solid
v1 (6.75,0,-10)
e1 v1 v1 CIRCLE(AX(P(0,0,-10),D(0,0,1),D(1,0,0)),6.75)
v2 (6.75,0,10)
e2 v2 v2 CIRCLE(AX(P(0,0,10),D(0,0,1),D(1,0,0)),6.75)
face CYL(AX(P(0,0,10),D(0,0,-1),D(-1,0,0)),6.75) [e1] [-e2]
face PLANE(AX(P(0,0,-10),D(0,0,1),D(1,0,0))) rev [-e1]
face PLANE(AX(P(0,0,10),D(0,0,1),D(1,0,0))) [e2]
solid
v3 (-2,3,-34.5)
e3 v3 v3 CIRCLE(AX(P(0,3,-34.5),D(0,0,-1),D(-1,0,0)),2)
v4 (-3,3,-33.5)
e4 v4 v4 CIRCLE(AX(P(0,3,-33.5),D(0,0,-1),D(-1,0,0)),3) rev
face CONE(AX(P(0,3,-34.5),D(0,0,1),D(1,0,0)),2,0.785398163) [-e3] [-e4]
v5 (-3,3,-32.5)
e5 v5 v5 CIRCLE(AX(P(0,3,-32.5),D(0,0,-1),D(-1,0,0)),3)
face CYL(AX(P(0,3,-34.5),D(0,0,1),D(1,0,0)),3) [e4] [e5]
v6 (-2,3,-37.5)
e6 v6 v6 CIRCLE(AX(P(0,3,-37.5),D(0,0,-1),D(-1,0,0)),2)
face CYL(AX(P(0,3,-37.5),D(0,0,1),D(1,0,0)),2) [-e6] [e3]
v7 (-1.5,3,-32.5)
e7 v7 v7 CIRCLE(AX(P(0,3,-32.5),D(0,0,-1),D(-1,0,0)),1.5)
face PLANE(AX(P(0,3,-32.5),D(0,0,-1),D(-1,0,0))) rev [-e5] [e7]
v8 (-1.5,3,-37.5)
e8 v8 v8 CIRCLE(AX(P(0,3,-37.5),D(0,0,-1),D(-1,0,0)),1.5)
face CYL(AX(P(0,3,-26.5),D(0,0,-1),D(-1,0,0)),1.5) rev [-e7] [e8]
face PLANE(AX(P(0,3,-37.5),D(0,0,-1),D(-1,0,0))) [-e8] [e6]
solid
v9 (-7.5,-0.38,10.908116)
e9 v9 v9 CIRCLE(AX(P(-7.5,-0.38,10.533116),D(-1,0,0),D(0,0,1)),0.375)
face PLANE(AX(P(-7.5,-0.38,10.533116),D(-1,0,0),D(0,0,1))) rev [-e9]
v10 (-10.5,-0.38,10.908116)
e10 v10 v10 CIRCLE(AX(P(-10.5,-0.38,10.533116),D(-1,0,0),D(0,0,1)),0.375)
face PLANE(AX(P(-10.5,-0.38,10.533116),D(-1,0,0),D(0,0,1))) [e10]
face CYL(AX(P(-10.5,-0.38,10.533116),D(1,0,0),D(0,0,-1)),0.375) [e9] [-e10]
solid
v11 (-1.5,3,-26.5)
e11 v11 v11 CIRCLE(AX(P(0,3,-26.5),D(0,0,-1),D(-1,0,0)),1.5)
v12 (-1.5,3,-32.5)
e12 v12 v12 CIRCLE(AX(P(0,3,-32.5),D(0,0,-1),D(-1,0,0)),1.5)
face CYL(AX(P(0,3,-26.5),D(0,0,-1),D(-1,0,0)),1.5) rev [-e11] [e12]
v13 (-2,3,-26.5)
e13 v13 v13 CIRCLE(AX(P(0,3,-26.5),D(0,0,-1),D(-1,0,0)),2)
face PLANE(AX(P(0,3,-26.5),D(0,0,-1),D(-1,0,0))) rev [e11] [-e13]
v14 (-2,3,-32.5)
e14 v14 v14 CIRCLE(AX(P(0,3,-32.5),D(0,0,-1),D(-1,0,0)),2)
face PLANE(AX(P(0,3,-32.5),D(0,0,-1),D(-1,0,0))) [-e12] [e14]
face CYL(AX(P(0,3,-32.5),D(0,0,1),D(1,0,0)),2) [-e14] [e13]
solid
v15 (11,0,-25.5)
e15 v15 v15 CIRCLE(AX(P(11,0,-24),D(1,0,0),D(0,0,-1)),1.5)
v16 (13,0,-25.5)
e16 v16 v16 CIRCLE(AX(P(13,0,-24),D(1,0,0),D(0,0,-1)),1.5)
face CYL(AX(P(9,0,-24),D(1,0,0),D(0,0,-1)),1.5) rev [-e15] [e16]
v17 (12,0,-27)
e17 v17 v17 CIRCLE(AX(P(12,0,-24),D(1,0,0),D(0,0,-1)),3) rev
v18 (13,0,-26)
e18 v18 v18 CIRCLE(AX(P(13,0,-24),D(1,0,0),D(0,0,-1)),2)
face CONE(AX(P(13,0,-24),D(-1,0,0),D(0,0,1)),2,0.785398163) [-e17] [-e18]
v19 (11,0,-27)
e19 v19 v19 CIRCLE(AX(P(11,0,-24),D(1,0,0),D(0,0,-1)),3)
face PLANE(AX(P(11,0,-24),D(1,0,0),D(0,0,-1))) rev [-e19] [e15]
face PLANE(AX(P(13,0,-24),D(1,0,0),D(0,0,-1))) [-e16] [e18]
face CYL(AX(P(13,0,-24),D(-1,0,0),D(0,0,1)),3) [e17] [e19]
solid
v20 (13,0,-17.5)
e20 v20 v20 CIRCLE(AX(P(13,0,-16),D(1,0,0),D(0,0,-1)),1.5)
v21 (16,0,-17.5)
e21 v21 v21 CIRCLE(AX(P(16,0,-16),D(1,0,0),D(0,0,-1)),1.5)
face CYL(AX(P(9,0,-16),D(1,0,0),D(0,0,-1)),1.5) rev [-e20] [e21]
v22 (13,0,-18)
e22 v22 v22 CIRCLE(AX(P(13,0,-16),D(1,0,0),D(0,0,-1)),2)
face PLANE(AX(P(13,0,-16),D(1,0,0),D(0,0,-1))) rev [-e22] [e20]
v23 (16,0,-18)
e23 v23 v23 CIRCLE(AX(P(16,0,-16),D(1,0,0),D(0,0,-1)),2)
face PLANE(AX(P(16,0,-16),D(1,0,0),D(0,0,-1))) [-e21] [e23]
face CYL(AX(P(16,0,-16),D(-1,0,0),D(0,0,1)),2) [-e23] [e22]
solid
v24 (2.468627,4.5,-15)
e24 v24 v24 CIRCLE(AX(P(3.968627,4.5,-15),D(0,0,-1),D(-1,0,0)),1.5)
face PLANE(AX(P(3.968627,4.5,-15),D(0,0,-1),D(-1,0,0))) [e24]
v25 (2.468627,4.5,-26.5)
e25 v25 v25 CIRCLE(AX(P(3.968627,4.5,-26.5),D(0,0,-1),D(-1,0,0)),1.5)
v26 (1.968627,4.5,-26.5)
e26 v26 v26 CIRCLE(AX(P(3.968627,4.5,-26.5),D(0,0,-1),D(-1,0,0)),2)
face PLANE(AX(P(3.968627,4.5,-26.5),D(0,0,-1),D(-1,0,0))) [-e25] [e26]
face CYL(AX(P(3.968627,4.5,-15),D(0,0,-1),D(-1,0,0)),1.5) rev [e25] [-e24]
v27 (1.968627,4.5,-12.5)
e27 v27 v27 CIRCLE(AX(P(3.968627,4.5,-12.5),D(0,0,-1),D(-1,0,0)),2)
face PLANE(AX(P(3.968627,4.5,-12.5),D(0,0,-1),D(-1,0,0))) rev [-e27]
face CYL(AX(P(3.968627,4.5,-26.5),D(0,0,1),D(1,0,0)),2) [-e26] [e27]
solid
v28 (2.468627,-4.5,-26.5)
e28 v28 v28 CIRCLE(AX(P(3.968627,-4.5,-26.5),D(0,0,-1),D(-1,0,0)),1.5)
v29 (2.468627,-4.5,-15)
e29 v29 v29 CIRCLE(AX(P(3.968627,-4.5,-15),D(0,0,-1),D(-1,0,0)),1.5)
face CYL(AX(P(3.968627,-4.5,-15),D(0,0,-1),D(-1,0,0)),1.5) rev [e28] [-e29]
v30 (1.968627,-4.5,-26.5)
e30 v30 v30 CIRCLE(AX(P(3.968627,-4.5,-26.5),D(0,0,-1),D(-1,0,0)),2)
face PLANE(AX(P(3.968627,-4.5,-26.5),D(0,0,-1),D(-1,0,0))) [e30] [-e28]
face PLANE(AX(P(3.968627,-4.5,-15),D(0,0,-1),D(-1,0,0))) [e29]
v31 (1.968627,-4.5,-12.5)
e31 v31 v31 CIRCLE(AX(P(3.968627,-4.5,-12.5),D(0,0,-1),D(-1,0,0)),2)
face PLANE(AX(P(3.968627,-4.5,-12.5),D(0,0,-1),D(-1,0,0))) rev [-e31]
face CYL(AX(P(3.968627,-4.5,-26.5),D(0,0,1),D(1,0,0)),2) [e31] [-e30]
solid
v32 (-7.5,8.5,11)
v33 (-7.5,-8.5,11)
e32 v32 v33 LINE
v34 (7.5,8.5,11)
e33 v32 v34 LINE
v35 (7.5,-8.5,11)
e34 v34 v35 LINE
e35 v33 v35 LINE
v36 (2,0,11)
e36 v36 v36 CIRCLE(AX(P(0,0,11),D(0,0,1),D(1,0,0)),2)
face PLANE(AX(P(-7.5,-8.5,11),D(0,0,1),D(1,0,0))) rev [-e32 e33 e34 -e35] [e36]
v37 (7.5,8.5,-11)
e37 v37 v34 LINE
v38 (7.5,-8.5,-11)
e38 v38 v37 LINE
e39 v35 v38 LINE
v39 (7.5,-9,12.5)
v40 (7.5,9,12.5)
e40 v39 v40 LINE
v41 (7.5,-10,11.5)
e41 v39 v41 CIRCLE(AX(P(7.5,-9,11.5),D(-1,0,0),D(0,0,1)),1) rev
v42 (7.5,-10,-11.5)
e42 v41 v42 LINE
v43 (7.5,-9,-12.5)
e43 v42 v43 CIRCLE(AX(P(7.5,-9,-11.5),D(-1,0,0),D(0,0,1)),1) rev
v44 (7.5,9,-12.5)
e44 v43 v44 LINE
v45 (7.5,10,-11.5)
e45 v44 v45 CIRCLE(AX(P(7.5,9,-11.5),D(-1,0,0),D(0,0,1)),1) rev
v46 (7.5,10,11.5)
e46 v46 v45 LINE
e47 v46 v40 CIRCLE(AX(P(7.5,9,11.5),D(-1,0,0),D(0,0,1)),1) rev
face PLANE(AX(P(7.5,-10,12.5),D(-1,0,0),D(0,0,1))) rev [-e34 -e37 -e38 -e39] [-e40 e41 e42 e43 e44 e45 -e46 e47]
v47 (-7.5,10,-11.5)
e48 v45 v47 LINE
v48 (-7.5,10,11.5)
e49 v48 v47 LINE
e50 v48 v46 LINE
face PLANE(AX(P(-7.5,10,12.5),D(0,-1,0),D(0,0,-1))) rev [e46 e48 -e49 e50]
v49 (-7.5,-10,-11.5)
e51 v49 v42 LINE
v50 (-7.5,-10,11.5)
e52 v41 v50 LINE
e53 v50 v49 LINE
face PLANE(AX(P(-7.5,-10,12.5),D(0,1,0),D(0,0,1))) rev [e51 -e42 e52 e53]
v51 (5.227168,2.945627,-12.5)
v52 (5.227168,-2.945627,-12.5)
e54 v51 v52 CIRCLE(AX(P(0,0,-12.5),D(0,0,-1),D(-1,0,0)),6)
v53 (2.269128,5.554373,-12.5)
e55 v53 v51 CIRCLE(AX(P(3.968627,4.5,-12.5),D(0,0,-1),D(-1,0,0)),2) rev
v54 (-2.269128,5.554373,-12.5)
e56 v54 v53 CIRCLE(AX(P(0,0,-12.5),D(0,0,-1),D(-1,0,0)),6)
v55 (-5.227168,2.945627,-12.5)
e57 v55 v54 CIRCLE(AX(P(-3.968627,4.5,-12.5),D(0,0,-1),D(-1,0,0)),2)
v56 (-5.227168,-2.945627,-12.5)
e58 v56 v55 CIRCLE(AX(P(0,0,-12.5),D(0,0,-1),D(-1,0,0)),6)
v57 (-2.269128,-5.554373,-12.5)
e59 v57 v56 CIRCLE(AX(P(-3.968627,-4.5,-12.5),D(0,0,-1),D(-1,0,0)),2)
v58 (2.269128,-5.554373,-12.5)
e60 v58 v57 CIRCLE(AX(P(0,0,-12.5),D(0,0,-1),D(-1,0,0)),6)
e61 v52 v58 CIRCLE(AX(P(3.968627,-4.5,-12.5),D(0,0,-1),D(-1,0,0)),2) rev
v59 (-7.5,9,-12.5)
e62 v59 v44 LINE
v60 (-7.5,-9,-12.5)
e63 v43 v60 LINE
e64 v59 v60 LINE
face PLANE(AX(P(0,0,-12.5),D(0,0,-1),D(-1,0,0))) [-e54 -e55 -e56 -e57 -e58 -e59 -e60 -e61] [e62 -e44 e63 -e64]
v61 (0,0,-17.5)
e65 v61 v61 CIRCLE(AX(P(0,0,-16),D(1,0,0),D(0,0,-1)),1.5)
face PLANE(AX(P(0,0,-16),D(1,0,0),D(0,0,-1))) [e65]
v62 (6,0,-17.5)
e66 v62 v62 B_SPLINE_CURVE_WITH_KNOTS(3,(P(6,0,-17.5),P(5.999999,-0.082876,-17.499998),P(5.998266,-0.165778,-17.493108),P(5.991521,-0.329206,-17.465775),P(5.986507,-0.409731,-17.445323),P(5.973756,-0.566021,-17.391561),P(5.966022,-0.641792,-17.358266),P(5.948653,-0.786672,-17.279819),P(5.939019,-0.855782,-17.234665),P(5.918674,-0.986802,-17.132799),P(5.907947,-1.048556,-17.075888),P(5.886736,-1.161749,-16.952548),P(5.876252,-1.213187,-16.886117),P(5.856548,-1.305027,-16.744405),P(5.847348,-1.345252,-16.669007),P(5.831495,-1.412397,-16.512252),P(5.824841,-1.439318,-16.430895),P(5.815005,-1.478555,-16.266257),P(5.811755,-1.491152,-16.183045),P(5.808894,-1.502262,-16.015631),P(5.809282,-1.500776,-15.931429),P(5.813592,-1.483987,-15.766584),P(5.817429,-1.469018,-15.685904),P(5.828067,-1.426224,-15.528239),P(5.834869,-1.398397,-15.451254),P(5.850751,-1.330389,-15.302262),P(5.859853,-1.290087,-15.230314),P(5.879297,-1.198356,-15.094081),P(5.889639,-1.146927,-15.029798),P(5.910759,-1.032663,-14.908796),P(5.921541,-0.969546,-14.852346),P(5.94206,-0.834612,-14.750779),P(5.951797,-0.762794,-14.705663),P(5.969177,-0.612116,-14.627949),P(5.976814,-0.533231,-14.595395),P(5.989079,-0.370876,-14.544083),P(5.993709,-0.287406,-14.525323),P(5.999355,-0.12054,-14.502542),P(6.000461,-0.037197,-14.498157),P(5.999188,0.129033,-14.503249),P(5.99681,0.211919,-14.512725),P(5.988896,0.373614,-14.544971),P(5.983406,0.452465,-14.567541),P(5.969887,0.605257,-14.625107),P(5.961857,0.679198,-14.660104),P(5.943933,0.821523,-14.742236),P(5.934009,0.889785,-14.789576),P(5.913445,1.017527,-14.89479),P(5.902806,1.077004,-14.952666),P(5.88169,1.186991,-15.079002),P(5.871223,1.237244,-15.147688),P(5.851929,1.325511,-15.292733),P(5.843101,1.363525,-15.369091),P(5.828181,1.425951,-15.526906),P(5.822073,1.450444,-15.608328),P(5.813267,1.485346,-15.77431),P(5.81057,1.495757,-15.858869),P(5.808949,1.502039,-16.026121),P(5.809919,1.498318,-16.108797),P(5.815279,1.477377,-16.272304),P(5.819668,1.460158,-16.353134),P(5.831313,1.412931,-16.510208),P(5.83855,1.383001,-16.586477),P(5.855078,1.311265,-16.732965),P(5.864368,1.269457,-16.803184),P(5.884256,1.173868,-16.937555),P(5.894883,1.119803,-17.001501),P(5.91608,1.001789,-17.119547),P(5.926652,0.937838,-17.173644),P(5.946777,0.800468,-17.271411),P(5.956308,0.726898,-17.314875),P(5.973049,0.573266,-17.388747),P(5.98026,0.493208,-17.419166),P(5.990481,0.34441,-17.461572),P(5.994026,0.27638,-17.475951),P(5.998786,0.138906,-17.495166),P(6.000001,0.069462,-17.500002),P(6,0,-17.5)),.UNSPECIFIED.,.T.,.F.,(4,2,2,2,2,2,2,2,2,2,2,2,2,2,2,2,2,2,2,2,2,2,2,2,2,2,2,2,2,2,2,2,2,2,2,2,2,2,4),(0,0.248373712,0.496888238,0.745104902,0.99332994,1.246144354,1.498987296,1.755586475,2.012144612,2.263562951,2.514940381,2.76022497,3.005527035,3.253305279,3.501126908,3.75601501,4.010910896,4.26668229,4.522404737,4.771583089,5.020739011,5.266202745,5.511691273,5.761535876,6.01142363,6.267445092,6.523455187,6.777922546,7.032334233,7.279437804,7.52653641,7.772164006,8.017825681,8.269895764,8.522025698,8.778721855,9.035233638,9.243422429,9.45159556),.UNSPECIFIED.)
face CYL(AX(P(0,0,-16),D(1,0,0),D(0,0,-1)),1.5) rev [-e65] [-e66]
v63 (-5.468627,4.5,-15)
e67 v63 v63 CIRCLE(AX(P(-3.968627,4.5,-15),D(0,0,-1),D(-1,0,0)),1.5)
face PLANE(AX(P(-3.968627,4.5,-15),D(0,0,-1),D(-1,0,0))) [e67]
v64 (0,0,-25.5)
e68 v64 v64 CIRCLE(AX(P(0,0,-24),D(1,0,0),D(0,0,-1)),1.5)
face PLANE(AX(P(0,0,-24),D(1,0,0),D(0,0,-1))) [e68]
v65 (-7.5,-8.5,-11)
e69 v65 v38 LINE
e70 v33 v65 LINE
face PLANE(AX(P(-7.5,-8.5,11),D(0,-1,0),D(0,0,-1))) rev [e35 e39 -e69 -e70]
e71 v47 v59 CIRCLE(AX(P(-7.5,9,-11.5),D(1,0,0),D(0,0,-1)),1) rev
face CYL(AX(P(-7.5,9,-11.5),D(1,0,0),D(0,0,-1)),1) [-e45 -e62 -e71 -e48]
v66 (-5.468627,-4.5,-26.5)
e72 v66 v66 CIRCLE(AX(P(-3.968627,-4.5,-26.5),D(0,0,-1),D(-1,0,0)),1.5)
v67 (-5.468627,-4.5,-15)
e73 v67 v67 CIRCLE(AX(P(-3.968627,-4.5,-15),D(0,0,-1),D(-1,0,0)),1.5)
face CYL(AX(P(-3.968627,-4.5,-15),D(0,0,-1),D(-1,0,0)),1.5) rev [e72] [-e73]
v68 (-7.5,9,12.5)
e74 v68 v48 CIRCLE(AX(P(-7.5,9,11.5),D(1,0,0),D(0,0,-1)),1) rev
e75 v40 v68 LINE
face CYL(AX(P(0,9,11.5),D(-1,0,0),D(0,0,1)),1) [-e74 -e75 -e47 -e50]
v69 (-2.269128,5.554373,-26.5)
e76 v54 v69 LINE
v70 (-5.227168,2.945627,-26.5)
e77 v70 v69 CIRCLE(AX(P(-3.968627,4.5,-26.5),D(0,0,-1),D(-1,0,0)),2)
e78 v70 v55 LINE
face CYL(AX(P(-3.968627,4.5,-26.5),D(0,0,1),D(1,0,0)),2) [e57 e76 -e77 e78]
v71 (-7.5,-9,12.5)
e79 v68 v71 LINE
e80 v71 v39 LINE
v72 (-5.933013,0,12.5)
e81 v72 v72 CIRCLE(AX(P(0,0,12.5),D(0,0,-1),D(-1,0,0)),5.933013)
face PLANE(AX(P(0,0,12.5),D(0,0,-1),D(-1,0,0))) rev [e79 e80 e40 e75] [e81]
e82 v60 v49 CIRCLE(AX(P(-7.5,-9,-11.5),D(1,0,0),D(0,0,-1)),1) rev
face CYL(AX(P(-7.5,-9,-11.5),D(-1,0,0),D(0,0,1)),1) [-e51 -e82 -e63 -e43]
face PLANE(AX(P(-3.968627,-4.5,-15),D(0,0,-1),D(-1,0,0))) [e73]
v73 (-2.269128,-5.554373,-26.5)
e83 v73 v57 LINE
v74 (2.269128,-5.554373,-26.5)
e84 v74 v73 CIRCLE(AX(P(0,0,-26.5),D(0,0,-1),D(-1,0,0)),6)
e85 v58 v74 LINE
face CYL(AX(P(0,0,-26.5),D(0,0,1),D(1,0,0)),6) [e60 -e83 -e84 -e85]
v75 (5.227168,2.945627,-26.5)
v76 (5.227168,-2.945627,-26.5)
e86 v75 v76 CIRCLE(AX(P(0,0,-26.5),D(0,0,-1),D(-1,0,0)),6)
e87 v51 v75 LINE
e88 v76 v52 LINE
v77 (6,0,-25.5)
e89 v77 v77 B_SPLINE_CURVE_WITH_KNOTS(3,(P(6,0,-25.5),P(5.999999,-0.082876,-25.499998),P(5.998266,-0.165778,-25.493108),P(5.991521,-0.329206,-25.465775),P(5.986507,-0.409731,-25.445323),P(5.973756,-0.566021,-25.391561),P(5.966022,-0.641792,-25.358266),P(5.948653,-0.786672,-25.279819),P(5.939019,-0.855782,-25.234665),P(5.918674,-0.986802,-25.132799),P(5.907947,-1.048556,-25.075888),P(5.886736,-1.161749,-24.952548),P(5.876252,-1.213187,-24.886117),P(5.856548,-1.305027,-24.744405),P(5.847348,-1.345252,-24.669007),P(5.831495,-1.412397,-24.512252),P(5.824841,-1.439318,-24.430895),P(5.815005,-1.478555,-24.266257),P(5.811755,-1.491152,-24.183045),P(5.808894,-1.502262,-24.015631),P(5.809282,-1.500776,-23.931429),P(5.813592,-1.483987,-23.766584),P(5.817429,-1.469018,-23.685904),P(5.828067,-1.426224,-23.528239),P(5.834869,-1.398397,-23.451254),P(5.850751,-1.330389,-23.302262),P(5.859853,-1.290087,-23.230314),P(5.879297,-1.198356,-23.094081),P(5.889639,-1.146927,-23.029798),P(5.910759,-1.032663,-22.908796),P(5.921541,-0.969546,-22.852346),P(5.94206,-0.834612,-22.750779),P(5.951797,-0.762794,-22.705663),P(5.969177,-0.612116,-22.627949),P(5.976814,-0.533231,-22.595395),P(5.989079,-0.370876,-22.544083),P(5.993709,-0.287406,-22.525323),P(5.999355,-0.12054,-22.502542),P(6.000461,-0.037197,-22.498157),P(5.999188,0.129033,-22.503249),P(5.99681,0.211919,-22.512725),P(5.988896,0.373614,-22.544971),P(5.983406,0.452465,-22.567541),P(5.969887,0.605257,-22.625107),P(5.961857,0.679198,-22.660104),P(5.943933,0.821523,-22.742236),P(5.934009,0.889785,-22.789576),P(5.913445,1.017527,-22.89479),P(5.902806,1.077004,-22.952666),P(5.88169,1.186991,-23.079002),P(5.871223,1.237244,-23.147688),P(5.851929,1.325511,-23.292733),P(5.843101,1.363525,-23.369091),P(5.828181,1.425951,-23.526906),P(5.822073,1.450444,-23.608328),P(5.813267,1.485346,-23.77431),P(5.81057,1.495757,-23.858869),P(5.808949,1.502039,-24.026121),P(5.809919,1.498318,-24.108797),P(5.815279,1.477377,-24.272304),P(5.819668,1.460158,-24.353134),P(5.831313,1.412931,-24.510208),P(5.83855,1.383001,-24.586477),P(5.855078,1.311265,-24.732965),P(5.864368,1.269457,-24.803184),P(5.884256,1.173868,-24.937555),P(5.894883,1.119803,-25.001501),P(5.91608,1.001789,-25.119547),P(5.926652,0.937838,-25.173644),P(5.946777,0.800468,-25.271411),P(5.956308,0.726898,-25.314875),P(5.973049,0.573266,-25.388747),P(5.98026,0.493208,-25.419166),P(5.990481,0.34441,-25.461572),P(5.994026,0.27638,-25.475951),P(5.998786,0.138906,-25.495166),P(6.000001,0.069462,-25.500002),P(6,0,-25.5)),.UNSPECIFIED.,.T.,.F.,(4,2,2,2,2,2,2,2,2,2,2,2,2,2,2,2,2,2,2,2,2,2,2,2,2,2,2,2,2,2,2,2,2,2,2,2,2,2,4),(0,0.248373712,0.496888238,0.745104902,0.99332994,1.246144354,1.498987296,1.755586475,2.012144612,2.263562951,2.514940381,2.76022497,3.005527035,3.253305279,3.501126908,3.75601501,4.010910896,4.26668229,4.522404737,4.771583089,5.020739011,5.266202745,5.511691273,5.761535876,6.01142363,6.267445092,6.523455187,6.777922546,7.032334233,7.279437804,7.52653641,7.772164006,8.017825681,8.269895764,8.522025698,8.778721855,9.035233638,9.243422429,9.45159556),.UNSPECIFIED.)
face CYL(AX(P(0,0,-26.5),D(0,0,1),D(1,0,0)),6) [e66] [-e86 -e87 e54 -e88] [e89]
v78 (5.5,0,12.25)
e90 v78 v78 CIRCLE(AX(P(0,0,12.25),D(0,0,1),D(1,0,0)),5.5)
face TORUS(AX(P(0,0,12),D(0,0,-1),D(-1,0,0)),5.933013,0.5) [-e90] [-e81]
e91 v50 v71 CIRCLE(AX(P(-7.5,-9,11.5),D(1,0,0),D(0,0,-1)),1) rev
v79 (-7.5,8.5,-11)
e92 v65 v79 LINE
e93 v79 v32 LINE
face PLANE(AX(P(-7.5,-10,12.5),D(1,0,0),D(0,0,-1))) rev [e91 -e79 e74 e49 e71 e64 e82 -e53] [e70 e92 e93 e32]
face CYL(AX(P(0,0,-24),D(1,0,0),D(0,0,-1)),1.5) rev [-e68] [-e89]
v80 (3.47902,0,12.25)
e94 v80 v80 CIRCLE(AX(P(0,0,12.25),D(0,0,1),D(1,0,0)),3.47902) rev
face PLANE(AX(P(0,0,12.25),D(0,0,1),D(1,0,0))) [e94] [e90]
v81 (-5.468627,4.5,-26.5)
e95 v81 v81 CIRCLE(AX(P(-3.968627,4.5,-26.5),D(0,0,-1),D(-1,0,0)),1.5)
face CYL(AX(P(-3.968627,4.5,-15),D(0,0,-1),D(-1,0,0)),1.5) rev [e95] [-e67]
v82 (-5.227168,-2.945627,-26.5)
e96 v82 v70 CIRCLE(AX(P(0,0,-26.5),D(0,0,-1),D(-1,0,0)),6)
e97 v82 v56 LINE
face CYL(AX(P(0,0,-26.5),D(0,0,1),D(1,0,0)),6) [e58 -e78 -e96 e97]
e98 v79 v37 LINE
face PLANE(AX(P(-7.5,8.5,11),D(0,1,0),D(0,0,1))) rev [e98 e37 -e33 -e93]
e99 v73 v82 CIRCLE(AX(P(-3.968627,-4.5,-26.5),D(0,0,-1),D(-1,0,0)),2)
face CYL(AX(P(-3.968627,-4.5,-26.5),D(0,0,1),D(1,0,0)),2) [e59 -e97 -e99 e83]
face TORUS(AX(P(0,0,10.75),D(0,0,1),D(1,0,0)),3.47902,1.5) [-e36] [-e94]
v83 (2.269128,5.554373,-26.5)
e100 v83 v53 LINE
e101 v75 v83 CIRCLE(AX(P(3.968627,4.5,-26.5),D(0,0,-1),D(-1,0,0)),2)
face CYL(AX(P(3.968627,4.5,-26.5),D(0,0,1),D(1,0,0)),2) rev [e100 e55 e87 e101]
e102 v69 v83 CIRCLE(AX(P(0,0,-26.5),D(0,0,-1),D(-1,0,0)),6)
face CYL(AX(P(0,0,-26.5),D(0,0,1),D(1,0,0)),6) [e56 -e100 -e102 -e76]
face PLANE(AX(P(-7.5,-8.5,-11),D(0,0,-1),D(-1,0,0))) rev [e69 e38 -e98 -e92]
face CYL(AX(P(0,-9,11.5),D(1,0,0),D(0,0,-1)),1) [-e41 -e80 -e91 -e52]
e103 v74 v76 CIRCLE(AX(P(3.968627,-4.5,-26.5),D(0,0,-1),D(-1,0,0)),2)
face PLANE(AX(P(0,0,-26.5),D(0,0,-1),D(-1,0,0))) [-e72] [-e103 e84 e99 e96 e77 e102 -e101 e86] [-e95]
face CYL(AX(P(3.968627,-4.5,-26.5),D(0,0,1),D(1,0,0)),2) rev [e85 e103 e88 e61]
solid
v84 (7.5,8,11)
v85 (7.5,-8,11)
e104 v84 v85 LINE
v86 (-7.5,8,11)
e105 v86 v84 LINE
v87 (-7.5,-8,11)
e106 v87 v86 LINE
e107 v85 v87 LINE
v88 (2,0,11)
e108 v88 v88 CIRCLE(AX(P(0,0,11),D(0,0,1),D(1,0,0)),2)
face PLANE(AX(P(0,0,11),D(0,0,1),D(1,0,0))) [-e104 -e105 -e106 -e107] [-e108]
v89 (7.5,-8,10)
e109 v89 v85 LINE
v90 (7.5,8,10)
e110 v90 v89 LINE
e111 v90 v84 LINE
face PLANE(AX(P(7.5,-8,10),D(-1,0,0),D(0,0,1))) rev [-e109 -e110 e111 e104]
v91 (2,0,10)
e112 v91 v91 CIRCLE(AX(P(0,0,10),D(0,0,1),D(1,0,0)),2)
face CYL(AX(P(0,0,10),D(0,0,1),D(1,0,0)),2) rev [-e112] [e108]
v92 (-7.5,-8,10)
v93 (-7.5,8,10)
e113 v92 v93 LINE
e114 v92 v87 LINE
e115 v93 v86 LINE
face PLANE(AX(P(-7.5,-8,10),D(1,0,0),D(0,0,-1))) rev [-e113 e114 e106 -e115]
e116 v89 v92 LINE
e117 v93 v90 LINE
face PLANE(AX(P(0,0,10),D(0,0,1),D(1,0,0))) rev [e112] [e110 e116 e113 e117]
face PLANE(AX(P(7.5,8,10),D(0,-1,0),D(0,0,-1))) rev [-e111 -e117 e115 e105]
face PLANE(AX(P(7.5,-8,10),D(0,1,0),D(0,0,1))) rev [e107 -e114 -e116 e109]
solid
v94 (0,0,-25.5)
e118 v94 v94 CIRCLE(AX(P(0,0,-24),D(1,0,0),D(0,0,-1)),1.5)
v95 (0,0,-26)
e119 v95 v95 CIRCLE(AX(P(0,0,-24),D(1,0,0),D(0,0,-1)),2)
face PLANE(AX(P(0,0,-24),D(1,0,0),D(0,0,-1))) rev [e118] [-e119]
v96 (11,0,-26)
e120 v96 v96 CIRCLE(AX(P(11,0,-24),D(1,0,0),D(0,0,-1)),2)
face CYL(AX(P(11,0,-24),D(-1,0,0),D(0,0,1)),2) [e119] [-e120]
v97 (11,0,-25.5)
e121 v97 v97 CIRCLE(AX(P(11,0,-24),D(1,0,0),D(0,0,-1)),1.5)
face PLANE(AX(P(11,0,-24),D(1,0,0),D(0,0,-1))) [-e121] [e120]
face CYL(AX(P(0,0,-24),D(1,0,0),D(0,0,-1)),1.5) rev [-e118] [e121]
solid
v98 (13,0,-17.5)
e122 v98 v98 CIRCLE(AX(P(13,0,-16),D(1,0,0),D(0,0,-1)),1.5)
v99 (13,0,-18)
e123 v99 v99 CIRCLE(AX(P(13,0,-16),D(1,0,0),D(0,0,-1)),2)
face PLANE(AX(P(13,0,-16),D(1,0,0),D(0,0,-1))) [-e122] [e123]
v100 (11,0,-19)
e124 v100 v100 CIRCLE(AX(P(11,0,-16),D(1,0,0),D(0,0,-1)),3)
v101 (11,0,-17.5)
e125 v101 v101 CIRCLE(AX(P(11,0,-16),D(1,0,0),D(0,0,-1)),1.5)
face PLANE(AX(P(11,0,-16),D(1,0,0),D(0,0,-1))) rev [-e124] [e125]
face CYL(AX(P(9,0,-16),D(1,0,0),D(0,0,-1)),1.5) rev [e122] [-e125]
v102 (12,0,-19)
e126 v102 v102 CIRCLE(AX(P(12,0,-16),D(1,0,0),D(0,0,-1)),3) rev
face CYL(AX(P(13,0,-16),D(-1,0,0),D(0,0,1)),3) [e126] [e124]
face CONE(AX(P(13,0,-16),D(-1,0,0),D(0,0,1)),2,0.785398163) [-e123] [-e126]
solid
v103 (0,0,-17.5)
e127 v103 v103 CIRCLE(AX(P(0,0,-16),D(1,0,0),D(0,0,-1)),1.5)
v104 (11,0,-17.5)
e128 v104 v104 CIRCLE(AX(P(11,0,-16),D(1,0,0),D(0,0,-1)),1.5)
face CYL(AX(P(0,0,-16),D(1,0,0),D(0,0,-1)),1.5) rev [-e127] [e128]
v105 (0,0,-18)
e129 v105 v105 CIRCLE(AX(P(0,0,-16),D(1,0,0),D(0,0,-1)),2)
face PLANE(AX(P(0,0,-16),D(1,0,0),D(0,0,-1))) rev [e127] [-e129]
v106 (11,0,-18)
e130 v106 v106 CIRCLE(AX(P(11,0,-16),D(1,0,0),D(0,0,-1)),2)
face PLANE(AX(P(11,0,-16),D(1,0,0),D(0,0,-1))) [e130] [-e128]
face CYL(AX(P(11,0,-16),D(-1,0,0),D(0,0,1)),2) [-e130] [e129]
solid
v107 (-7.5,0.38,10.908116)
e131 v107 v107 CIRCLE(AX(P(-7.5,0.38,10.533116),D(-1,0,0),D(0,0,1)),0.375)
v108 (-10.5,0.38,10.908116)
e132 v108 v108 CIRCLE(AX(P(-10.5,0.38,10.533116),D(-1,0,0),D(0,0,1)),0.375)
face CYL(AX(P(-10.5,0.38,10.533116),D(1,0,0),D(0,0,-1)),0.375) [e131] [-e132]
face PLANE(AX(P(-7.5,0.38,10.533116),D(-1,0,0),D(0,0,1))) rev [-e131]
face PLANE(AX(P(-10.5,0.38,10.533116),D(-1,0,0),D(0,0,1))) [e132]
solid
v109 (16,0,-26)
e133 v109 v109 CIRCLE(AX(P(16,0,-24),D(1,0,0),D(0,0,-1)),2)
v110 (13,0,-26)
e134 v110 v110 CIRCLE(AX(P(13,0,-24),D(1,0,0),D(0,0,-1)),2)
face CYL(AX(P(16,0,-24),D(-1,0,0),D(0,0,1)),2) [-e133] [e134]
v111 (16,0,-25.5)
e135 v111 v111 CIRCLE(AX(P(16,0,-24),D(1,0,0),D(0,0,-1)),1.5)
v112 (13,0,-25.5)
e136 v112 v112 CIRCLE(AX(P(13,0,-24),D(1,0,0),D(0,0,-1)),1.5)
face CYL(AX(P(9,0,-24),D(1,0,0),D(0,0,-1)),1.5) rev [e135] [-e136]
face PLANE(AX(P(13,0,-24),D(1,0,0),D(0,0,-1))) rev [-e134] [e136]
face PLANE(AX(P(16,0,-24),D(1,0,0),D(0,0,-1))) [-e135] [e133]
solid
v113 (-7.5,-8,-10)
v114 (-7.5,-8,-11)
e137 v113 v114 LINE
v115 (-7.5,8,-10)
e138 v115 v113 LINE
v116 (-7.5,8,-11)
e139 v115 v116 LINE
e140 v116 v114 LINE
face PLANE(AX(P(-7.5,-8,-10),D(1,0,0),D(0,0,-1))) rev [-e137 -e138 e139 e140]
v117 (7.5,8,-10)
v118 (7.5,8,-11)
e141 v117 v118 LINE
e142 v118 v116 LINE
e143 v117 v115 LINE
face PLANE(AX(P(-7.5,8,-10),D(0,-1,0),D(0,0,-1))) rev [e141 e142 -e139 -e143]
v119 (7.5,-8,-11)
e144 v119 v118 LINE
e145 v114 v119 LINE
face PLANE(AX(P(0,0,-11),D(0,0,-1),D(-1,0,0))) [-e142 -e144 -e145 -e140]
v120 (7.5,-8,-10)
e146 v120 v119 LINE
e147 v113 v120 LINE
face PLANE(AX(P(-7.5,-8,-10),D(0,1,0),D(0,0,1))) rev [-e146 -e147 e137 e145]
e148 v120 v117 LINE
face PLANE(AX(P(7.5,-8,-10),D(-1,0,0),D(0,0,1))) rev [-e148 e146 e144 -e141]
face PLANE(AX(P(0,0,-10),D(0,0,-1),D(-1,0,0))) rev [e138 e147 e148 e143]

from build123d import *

# Parameters (mm, degrees)
SKETCH1_W                    = 15
SKETCH1_H                    = 20
OUTER_SHELL_DEPTH            = 12.5
SKETCH2_W                    = 22
SKETCH2_H                    = 17
CUT_EXTRUDE1_DEPTH           = 15
SKETCH4_W                    = 15
SKETCH4_H                    = 16
INNER1_DEPTH                 = 1
SKETCH5_W                    = 15
SKETCH5_H                    = 16
INNER2_DEPTH                 = 1
SKETCH6_R                    = 6.75
INNER_CYLINDER_DEPTH         = 20
FILLET1_R                    = 1
SKETCH7_R                    = 5.5
CUT_EXTRUDE2_DEPTH           = 0.25
SKETCH8_R                    = 2
CUT_EXTRUDE3_DEPTH           = 2.25
FILLET2_R                    = 0.5
FILLET3_R                    = 1.5
SKETCH9_R                    = 6
OUTER_CYLINDER_DEPTH         = 14
SKETCH10_R                   = 2
CIRCLE_CUTS_DEPTH            = 28.950849719
SKETCH11_R                   = 2
SMALL_CYLINDERS_DEPTH        = 14
SMALL_CYLINDERS_2_DEPTH      = 14
SMALL_CYLINDERS_3_DEPTH      = 14
SMALL_CYLINDERS_4_DEPTH      = 14
SKETCH12_R                   = 1.5
CUT_EXTRUDE6_DEPTH           = 11.5
BOSS_EXTRUDE9_DEPTH          = 14
SKETCH15_R                   = 2
HORIZONTAL_CYLINDERS_DEPTH   = 11
HORIZONTAL_CYLINDERS_2_DEPTH = 11
SKETCH16_R                   = 1.5
CUT_EXTRUDE7_DEPTH           = 11
SKETCH17_R                   = 3
BOSS_EXTRUDE11_DEPTH         = 2
BOSS_EXTRUDE11_2_DEPTH       = 2
SKETCH19_R                   = 2
BOSS_EXTRUDE12_DEPTH         = 3
BOSS_EXTRUDE12_2_DEPTH       = 3
CHAMFER2_SIZE                = 1
CHAMFER3_SIZE                = 1
SKETCH20_R                   = 1.5
CUT_EXTRUDE8_DEPTH           = 7
SKETCH21_R                   = 2
BOSS_EXTRUDE13_DEPTH         = 6
SKETCH22_R                   = 3
BOSS_EXTRUDE14_DEPTH         = 2
SKETCH23_R                   = 2
BOSS_EXTRUDE15_DEPTH         = 3
CHAMFER4_SIZE                = 1
SKETCH24_R                   = 1.5
CUT_EXTRUDE9_DEPTH           = 11
SKETCH25_R                   = 0.375
BOSS_EXTRUDE17_DEPTH         = 3
BOSS_EXTRUDE17_2_DEPTH       = 3


# Some blends are built 0.0001 mm under size
with BuildPart() as part:
    # Sketch1 → Outer Shell (new, symmetric)
    with BuildSketch(Plane.XY):
        Rectangle(SKETCH1_W, SKETCH1_H)
    extrude(amount=OUTER_SHELL_DEPTH, both=True)

    # Sketch2 → Cut-Extrude1 (cut)
    with BuildSketch(Plane(origin=(7.5, 0, 0), x_dir=(0, 0, -1), z_dir=(1, 0, 0))):
        Rectangle(SKETCH2_W, SKETCH2_H)
    extrude(amount=-CUT_EXTRUDE1_DEPTH, mode=Mode.SUBTRACT)

    # Fillet1
    fillet1_edges = [part.edges().sort_by_distance(p)[0] for p in [
        (0, -10, 12.5),
        (0, -10, -12.5),
        (0, 10, -12.5),
        (0, 10, 12.5),
    ]]
    fillet(fillet1_edges, radius=FILLET1_R)

    # Sketch7 → Cut-Extrude2 (cut)
    with BuildSketch(Plane.XY.offset(12.5)):
        Circle(SKETCH7_R)
    extrude(amount=-CUT_EXTRUDE2_DEPTH, mode=Mode.SUBTRACT)


with BuildPart() as body_2:
    # Sketch4 → Inner1 (new body)
    with BuildSketch(Plane(origin=(0, 0, 11), x_dir=(-1, 0, 0), z_dir=(0, 0, -1))):
        Rectangle(SKETCH4_W, SKETCH4_H)
    extrude(amount=INNER1_DEPTH)


with BuildPart() as body_3:
    # Sketch5 → Inner2 (new body)
    with BuildSketch(Plane.XY.offset(-11)):
        Rectangle(SKETCH5_W, SKETCH5_H)
    extrude(amount=INNER2_DEPTH)


with BuildPart() as body_4:
    # Sketch6 → Inner Cylinder (new body)
    with BuildSketch(Plane.XY.offset(-10)):
        Circle(SKETCH6_R)
    extrude(amount=INNER_CYLINDER_DEPTH)


with BuildPart() as cut_extrude3_tool:
    # Sketch8 → Cut-Extrude3 (new body)
    with BuildSketch(Plane.XY.offset(12.25)):
        Circle(SKETCH8_R)
    extrude(amount=-CUT_EXTRUDE3_DEPTH)


with BuildPart() as part_1:
    add(part.part)

    # Cut-Extrude3: cut by cut_extrude3_tool
    add(cut_extrude3_tool.part, mode=Mode.SUBTRACT)

    # Fillet2
    # the kernel refuses this fillet: 0.5 mm, written as the material it takes off along each edge
    with BuildSketch(Plane(origin=(0, 0, 12.5), x_dir=(1, 0, 0), z_dir=(0, -1, 0))) as fillet2_piece_1:
        with BuildLine():
            CenterArc((5.933012702, -0.5), FILLET2_R, 90, 60)
            Line((5.5, -0.25), (5.491339746, -0.245))
            ThreePointArc((5.491339746, -0.245), (5.49, -0.125), (5.49, 0))
            Line((5.49, 0), (5.5, 0.01))
            Line((5.5, 0.01), (5.933012702, 0.01))
            Line((5.933012702, 0.01), (5.933012702, 0))
        make_face()
    revolve(axis=Axis((0, 0, 12.5), (0, 0, 1)), mode=Mode.SUBTRACT)

    # Fillet3
    # the kernel refuses this fillet: 1.5 mm, written as the material it takes off along each edge
    with BuildSketch(Plane(origin=(0, 0, 12.25), x_dir=(1, 0, 0), z_dir=(0, -1, 0))) as fillet3_piece_1:
        with BuildLine():
            CenterArc((3.479019946, -1.5), FILLET3_R, 90, 80.405931773)
            Line((3.479019946, 0), (3.479019946, 0.03))
            Line((3.479019946, 0.03), (2, 0.03))
            Line((2, 0.03), (1.97, 0))
            ThreePointArc((1.97, 0), (1.97, -0.625), (1.970419601, -1.245))
            Line((1.970419601, -1.245), (2, -1.25))
        make_face()
    revolve(axis=Axis((0, 0, 12.25), (0, 0, 1)), mode=Mode.SUBTRACT)



with BuildPart() as body_2_1:
    add(body_2.part)

    # Cut-Extrude3: cut by cut_extrude3_tool
    add(cut_extrude3_tool.part, mode=Mode.SUBTRACT)


with BuildPart() as body_5:
    # Sketch9 → outer cylinder (new body)
    with BuildSketch(Plane(origin=(0, 0, -12.5), x_dir=(-1, 0, 0), z_dir=(0, 0, -1))):
        Circle(SKETCH9_R)
    extrude(amount=OUTER_CYLINDER_DEPTH)

    # Sketch10 → circle cuts (cut, through all)
    with BuildSketch(Plane(origin=(0, 0, -12.5), x_dir=(-1, 0, 0), z_dir=(0, 0, -1))):
        with Locations((-3.968626967, -4.5)):
            Circle(SKETCH10_R)
        with Locations((3.968626967, -4.5)):
            Circle(SKETCH10_R)
        with Locations((3.968626967, 4.5)):
            Circle(SKETCH10_R)
        with Locations((-3.968626967, 4.5)):
            Circle(SKETCH10_R)
    extrude(amount=CIRCLE_CUTS_DEPTH, mode=Mode.SUBTRACT)


with BuildPart() as body_6:
    # Sketch11 → small cylinders (new body)
    with BuildSketch(Plane(origin=(0, 0, -12.5), x_dir=(-1, 0, 0), z_dir=(0, 0, -1))):
        with Locations((-3.968626967, 4.5)):
            Circle(SKETCH11_R)
    extrude(amount=SMALL_CYLINDERS_DEPTH)


with BuildPart() as body_7:
    # Sketch11 → small cylinders 2 (new body)
    with BuildSketch(Plane(origin=(0, 0, -12.5), x_dir=(-1, 0, 0), z_dir=(0, 0, -1))):
        with Locations((3.968626967, 4.5)):
            Circle(SKETCH11_R)
    extrude(amount=SMALL_CYLINDERS_2_DEPTH)


with BuildPart() as body_8:
    # Sketch11 → small cylinders 3 (new body)
    with BuildSketch(Plane(origin=(0, 0, -12.5), x_dir=(-1, 0, 0), z_dir=(0, 0, -1))):
        with Locations((-3.968626967, -4.5)):
            Circle(SKETCH11_R)
    extrude(amount=SMALL_CYLINDERS_3_DEPTH)


with BuildPart() as body_9:
    # Sketch11 → small cylinders 4 (new body)
    with BuildSketch(Plane(origin=(0, 0, -12.5), x_dir=(-1, 0, 0), z_dir=(0, 0, -1))):
        with Locations((3.968626967, -4.5)):
            Circle(SKETCH11_R)
    extrude(amount=SMALL_CYLINDERS_4_DEPTH)


with BuildPart() as cut_extrude6_tool:
    # Sketch12 → Cut-Extrude6 (new body)
    with BuildSketch(Plane(origin=(0, 0, -26.5), x_dir=(-1, 0, 0), z_dir=(0, 0, -1))):
        with Locations((-3.968626967, 4.5)):
            Circle(SKETCH12_R)
        with Locations((3.968626967, 4.5)):
            Circle(SKETCH12_R)
        with Locations((-3.968626967, -4.5)):
            Circle(SKETCH12_R)
        with Locations((3.968626967, -4.5)):
            Circle(SKETCH12_R)
    extrude(amount=-CUT_EXTRUDE6_DEPTH)


with BuildPart() as body_6_1:
    add(body_6.part)

    # Cut-Extrude6: cut by cut_extrude6_tool
    add(cut_extrude6_tool.part, mode=Mode.SUBTRACT)


with BuildPart() as body_7_1:
    add(body_7.part)

    # Cut-Extrude6: cut by cut_extrude6_tool
    add(cut_extrude6_tool.part, mode=Mode.SUBTRACT)


with BuildPart() as body_8_1:
    add(body_8.part)

    # Cut-Extrude6: cut by cut_extrude6_tool
    add(cut_extrude6_tool.part, mode=Mode.SUBTRACT)


with BuildPart() as body_9_1:
    add(body_9.part)

    # Cut-Extrude6: cut by cut_extrude6_tool
    add(cut_extrude6_tool.part, mode=Mode.SUBTRACT)


with BuildPart() as part_2:
    add(part_1.part)

    add(body_5.part)  # Boss-Extrude9 merges body 5

    add(body_7_1.part)  # Boss-Extrude9 merges body 7

    add(body_9_1.part)  # Boss-Extrude9 merges body 9
    # Sketch14 → Boss-Extrude9 (add)
    with BuildSketch(Plane(origin=(0, 0, -12.5), x_dir=(-1, 0, 0), z_dir=(0, 0, -1))):
        Polygon((5.227167636, 2.945627013), (5.227167636, -2.945627013), (4.923679057, -2.700868739), (4.923679057, 2.642138434), align=None)
    extrude(amount=BOSS_EXTRUDE9_DEPTH)


with BuildPart() as body_7_2:
    # Sketch15 → horizontal cylinders (new body)
    with BuildSketch(Plane(origin=(0, 0, 0), x_dir=(0, 0, -1), z_dir=(1, 0, 0))):
        with Locations((16, 0)):
            Circle(SKETCH15_R)
    extrude(amount=HORIZONTAL_CYLINDERS_DEPTH)


with BuildPart() as body_8_2:
    # Sketch15 → horizontal cylinders 2 (new body)
    with BuildSketch(Plane(origin=(0, 0, 0), x_dir=(0, 0, -1), z_dir=(1, 0, 0))):
        with Locations((24, 0)):
            Circle(SKETCH15_R)
    extrude(amount=HORIZONTAL_CYLINDERS_2_DEPTH)


with BuildPart() as cut_extrude7_tool:
    # Sketch16 → Cut-Extrude7 (new body)
    with BuildSketch(Plane(origin=(11, 0, 0), x_dir=(0, 0, -1), z_dir=(1, 0, 0))):
        with Locations((16, 0)):
            Circle(SKETCH16_R)
        with Locations((24, 0)):
            Circle(SKETCH16_R)
    extrude(amount=-CUT_EXTRUDE7_DEPTH)


with BuildPart() as part_3:
    add(part_2.part)

    # Cut-Extrude7: cut by cut_extrude7_tool
    add(cut_extrude7_tool.part, mode=Mode.SUBTRACT)


with BuildPart() as body_7_2_1:
    add(body_7_2.part)

    # Cut-Extrude7: cut by cut_extrude7_tool
    add(cut_extrude7_tool.part, mode=Mode.SUBTRACT)


with BuildPart() as body_8_2_1:
    add(body_8_2.part)

    # Cut-Extrude7: cut by cut_extrude7_tool
    add(cut_extrude7_tool.part, mode=Mode.SUBTRACT)


with BuildPart() as body_9_2:
    # Sketch17 → Boss-Extrude11 (new body)
    with BuildSketch(Plane(origin=(11, 0, 0), x_dir=(0, 0, -1), z_dir=(1, 0, 0))):
        with Locations((16, 0)):
            Circle(SKETCH17_R)
    extrude(amount=BOSS_EXTRUDE11_DEPTH)

    # Chamfer3
    chamfer3_edges = [body_9_2.edges().sort_by_distance(p)[0] for p in [
        (13, 0, -13),
    ]]
    chamfer(chamfer3_edges, length=CHAMFER3_SIZE)


with BuildPart() as body_10:
    # Sketch17 → Boss-Extrude11 2 (new body)
    with BuildSketch(Plane(origin=(11, 0, 0), x_dir=(0, 0, -1), z_dir=(1, 0, 0))):
        with Locations((24, 0)):
            Circle(SKETCH17_R)
    extrude(amount=BOSS_EXTRUDE11_2_DEPTH)

    # Chamfer2
    chamfer2_edges = [body_10.edges().sort_by_distance(p)[0] for p in [
        (13, 0, -21),
    ]]
    chamfer(chamfer2_edges, length=CHAMFER2_SIZE)


with BuildPart() as body_11:
    # Sketch19 → Boss-Extrude12 (new body)
    with BuildSketch(Plane(origin=(13, 0, 0), x_dir=(0, 0, -1), z_dir=(1, 0, 0))):
        with Locations((16, 0)):
            Circle(SKETCH19_R)
    extrude(amount=BOSS_EXTRUDE12_DEPTH)


with BuildPart() as body_12:
    # Sketch19 → Boss-Extrude12 2 (new body)
    with BuildSketch(Plane(origin=(13, 0, 0), x_dir=(0, 0, -1), z_dir=(1, 0, 0))):
        with Locations((24, 0)):
            Circle(SKETCH19_R)
    extrude(amount=BOSS_EXTRUDE12_2_DEPTH)


with BuildPart() as cut_extrude8_tool:
    # Sketch20 → Cut-Extrude8 (new body)
    with BuildSketch(Plane(origin=(16, 0, 0), x_dir=(0, 0, -1), z_dir=(1, 0, 0))):
        with Locations((16, 0)):
            Circle(SKETCH20_R)
        with Locations((24, 0)):
            Circle(SKETCH20_R)
    extrude(amount=-CUT_EXTRUDE8_DEPTH)


with BuildPart() as body_9_2_1:
    add(body_9_2.part)

    # Cut-Extrude8: cut by cut_extrude8_tool
    add(cut_extrude8_tool.part, mode=Mode.SUBTRACT)


with BuildPart() as body_10_1:
    add(body_10.part)

    # Cut-Extrude8: cut by cut_extrude8_tool
    add(cut_extrude8_tool.part, mode=Mode.SUBTRACT)


with BuildPart() as body_11_1:
    add(body_11.part)

    # Cut-Extrude8: cut by cut_extrude8_tool
    add(cut_extrude8_tool.part, mode=Mode.SUBTRACT)


with BuildPart() as body_12_1:
    add(body_12.part)

    # Cut-Extrude8: cut by cut_extrude8_tool
    add(cut_extrude8_tool.part, mode=Mode.SUBTRACT)


with BuildPart() as body_13:
    # Sketch21 → Boss-Extrude13 (new body)
    with BuildSketch(Plane(origin=(0, 0, -26.5), x_dir=(-1, 0, 0), z_dir=(0, 0, -1))):
        with Locations((0, 3)):
            Circle(SKETCH21_R)
    extrude(amount=BOSS_EXTRUDE13_DEPTH)


with BuildPart() as body_14:
    # Sketch22 → Boss-Extrude14 (new body)
    with BuildSketch(Plane(origin=(0, 0, -32.5), x_dir=(-1, 0, 0), z_dir=(0, 0, -1))):
        with Locations((0, 3)):
            Circle(SKETCH22_R)
    extrude(amount=BOSS_EXTRUDE14_DEPTH)

    # Sketch23 → Boss-Extrude15 (add)
    with BuildSketch(Plane(origin=(0, 0, -34.5), x_dir=(-1, 0, 0), z_dir=(0, 0, -1))):
        with Locations((0, 3)):
            Circle(SKETCH23_R)
    extrude(amount=BOSS_EXTRUDE15_DEPTH)

    # Chamfer4
    chamfer4_edges = [body_14.edges().sort_by_distance(p)[0] for p in [
        (3, 3, -34.5),
    ]]
    chamfer(chamfer4_edges, length=CHAMFER4_SIZE - 0.0001)  # a hair under: the kernel refuses the full size


with BuildPart() as cut_extrude9_tool:
    # Sketch24 → Cut-Extrude9 (new body)
    with BuildSketch(Plane(origin=(0, 0, -37.5), x_dir=(-1, 0, 0), z_dir=(0, 0, -1))):
        with Locations((0, 3)):
            Circle(SKETCH24_R)
    extrude(amount=-CUT_EXTRUDE9_DEPTH)


with BuildPart() as body_13_1:
    add(body_13.part)

    # Cut-Extrude9: cut by cut_extrude9_tool
    add(cut_extrude9_tool.part, mode=Mode.SUBTRACT)


with BuildPart() as body_14_1:
    add(body_14.part)

    # Cut-Extrude9: cut by cut_extrude9_tool
    add(cut_extrude9_tool.part, mode=Mode.SUBTRACT)


with BuildPart() as body_15:
    # Sketch25 → Boss-Extrude17 (new body)
    with BuildSketch(Plane.ZY.offset(7.5)):
        with Locations((10.533115749, 0.38)):
            Circle(SKETCH25_R)
    extrude(amount=BOSS_EXTRUDE17_DEPTH)


with BuildPart() as body_16:
    # Sketch25 → Boss-Extrude17 2 (new body)
    with BuildSketch(Plane.ZY.offset(7.5)):
        with Locations((10.533115749, -0.38)):
            Circle(SKETCH25_R)
    extrude(amount=BOSS_EXTRUDE17_2_DEPTH)


solid = Compound([body_3.part, body_4.part, body_2_1.part, body_6_1.part, body_8_1.part, part_3.part, body_7_2_1.part, body_8_2_1.part, body_9_2_1.part, body_10_1.part, body_11_1.part, body_12_1.part, body_13_1.part, body_14_1.part, body_15.part, body_16.part])
